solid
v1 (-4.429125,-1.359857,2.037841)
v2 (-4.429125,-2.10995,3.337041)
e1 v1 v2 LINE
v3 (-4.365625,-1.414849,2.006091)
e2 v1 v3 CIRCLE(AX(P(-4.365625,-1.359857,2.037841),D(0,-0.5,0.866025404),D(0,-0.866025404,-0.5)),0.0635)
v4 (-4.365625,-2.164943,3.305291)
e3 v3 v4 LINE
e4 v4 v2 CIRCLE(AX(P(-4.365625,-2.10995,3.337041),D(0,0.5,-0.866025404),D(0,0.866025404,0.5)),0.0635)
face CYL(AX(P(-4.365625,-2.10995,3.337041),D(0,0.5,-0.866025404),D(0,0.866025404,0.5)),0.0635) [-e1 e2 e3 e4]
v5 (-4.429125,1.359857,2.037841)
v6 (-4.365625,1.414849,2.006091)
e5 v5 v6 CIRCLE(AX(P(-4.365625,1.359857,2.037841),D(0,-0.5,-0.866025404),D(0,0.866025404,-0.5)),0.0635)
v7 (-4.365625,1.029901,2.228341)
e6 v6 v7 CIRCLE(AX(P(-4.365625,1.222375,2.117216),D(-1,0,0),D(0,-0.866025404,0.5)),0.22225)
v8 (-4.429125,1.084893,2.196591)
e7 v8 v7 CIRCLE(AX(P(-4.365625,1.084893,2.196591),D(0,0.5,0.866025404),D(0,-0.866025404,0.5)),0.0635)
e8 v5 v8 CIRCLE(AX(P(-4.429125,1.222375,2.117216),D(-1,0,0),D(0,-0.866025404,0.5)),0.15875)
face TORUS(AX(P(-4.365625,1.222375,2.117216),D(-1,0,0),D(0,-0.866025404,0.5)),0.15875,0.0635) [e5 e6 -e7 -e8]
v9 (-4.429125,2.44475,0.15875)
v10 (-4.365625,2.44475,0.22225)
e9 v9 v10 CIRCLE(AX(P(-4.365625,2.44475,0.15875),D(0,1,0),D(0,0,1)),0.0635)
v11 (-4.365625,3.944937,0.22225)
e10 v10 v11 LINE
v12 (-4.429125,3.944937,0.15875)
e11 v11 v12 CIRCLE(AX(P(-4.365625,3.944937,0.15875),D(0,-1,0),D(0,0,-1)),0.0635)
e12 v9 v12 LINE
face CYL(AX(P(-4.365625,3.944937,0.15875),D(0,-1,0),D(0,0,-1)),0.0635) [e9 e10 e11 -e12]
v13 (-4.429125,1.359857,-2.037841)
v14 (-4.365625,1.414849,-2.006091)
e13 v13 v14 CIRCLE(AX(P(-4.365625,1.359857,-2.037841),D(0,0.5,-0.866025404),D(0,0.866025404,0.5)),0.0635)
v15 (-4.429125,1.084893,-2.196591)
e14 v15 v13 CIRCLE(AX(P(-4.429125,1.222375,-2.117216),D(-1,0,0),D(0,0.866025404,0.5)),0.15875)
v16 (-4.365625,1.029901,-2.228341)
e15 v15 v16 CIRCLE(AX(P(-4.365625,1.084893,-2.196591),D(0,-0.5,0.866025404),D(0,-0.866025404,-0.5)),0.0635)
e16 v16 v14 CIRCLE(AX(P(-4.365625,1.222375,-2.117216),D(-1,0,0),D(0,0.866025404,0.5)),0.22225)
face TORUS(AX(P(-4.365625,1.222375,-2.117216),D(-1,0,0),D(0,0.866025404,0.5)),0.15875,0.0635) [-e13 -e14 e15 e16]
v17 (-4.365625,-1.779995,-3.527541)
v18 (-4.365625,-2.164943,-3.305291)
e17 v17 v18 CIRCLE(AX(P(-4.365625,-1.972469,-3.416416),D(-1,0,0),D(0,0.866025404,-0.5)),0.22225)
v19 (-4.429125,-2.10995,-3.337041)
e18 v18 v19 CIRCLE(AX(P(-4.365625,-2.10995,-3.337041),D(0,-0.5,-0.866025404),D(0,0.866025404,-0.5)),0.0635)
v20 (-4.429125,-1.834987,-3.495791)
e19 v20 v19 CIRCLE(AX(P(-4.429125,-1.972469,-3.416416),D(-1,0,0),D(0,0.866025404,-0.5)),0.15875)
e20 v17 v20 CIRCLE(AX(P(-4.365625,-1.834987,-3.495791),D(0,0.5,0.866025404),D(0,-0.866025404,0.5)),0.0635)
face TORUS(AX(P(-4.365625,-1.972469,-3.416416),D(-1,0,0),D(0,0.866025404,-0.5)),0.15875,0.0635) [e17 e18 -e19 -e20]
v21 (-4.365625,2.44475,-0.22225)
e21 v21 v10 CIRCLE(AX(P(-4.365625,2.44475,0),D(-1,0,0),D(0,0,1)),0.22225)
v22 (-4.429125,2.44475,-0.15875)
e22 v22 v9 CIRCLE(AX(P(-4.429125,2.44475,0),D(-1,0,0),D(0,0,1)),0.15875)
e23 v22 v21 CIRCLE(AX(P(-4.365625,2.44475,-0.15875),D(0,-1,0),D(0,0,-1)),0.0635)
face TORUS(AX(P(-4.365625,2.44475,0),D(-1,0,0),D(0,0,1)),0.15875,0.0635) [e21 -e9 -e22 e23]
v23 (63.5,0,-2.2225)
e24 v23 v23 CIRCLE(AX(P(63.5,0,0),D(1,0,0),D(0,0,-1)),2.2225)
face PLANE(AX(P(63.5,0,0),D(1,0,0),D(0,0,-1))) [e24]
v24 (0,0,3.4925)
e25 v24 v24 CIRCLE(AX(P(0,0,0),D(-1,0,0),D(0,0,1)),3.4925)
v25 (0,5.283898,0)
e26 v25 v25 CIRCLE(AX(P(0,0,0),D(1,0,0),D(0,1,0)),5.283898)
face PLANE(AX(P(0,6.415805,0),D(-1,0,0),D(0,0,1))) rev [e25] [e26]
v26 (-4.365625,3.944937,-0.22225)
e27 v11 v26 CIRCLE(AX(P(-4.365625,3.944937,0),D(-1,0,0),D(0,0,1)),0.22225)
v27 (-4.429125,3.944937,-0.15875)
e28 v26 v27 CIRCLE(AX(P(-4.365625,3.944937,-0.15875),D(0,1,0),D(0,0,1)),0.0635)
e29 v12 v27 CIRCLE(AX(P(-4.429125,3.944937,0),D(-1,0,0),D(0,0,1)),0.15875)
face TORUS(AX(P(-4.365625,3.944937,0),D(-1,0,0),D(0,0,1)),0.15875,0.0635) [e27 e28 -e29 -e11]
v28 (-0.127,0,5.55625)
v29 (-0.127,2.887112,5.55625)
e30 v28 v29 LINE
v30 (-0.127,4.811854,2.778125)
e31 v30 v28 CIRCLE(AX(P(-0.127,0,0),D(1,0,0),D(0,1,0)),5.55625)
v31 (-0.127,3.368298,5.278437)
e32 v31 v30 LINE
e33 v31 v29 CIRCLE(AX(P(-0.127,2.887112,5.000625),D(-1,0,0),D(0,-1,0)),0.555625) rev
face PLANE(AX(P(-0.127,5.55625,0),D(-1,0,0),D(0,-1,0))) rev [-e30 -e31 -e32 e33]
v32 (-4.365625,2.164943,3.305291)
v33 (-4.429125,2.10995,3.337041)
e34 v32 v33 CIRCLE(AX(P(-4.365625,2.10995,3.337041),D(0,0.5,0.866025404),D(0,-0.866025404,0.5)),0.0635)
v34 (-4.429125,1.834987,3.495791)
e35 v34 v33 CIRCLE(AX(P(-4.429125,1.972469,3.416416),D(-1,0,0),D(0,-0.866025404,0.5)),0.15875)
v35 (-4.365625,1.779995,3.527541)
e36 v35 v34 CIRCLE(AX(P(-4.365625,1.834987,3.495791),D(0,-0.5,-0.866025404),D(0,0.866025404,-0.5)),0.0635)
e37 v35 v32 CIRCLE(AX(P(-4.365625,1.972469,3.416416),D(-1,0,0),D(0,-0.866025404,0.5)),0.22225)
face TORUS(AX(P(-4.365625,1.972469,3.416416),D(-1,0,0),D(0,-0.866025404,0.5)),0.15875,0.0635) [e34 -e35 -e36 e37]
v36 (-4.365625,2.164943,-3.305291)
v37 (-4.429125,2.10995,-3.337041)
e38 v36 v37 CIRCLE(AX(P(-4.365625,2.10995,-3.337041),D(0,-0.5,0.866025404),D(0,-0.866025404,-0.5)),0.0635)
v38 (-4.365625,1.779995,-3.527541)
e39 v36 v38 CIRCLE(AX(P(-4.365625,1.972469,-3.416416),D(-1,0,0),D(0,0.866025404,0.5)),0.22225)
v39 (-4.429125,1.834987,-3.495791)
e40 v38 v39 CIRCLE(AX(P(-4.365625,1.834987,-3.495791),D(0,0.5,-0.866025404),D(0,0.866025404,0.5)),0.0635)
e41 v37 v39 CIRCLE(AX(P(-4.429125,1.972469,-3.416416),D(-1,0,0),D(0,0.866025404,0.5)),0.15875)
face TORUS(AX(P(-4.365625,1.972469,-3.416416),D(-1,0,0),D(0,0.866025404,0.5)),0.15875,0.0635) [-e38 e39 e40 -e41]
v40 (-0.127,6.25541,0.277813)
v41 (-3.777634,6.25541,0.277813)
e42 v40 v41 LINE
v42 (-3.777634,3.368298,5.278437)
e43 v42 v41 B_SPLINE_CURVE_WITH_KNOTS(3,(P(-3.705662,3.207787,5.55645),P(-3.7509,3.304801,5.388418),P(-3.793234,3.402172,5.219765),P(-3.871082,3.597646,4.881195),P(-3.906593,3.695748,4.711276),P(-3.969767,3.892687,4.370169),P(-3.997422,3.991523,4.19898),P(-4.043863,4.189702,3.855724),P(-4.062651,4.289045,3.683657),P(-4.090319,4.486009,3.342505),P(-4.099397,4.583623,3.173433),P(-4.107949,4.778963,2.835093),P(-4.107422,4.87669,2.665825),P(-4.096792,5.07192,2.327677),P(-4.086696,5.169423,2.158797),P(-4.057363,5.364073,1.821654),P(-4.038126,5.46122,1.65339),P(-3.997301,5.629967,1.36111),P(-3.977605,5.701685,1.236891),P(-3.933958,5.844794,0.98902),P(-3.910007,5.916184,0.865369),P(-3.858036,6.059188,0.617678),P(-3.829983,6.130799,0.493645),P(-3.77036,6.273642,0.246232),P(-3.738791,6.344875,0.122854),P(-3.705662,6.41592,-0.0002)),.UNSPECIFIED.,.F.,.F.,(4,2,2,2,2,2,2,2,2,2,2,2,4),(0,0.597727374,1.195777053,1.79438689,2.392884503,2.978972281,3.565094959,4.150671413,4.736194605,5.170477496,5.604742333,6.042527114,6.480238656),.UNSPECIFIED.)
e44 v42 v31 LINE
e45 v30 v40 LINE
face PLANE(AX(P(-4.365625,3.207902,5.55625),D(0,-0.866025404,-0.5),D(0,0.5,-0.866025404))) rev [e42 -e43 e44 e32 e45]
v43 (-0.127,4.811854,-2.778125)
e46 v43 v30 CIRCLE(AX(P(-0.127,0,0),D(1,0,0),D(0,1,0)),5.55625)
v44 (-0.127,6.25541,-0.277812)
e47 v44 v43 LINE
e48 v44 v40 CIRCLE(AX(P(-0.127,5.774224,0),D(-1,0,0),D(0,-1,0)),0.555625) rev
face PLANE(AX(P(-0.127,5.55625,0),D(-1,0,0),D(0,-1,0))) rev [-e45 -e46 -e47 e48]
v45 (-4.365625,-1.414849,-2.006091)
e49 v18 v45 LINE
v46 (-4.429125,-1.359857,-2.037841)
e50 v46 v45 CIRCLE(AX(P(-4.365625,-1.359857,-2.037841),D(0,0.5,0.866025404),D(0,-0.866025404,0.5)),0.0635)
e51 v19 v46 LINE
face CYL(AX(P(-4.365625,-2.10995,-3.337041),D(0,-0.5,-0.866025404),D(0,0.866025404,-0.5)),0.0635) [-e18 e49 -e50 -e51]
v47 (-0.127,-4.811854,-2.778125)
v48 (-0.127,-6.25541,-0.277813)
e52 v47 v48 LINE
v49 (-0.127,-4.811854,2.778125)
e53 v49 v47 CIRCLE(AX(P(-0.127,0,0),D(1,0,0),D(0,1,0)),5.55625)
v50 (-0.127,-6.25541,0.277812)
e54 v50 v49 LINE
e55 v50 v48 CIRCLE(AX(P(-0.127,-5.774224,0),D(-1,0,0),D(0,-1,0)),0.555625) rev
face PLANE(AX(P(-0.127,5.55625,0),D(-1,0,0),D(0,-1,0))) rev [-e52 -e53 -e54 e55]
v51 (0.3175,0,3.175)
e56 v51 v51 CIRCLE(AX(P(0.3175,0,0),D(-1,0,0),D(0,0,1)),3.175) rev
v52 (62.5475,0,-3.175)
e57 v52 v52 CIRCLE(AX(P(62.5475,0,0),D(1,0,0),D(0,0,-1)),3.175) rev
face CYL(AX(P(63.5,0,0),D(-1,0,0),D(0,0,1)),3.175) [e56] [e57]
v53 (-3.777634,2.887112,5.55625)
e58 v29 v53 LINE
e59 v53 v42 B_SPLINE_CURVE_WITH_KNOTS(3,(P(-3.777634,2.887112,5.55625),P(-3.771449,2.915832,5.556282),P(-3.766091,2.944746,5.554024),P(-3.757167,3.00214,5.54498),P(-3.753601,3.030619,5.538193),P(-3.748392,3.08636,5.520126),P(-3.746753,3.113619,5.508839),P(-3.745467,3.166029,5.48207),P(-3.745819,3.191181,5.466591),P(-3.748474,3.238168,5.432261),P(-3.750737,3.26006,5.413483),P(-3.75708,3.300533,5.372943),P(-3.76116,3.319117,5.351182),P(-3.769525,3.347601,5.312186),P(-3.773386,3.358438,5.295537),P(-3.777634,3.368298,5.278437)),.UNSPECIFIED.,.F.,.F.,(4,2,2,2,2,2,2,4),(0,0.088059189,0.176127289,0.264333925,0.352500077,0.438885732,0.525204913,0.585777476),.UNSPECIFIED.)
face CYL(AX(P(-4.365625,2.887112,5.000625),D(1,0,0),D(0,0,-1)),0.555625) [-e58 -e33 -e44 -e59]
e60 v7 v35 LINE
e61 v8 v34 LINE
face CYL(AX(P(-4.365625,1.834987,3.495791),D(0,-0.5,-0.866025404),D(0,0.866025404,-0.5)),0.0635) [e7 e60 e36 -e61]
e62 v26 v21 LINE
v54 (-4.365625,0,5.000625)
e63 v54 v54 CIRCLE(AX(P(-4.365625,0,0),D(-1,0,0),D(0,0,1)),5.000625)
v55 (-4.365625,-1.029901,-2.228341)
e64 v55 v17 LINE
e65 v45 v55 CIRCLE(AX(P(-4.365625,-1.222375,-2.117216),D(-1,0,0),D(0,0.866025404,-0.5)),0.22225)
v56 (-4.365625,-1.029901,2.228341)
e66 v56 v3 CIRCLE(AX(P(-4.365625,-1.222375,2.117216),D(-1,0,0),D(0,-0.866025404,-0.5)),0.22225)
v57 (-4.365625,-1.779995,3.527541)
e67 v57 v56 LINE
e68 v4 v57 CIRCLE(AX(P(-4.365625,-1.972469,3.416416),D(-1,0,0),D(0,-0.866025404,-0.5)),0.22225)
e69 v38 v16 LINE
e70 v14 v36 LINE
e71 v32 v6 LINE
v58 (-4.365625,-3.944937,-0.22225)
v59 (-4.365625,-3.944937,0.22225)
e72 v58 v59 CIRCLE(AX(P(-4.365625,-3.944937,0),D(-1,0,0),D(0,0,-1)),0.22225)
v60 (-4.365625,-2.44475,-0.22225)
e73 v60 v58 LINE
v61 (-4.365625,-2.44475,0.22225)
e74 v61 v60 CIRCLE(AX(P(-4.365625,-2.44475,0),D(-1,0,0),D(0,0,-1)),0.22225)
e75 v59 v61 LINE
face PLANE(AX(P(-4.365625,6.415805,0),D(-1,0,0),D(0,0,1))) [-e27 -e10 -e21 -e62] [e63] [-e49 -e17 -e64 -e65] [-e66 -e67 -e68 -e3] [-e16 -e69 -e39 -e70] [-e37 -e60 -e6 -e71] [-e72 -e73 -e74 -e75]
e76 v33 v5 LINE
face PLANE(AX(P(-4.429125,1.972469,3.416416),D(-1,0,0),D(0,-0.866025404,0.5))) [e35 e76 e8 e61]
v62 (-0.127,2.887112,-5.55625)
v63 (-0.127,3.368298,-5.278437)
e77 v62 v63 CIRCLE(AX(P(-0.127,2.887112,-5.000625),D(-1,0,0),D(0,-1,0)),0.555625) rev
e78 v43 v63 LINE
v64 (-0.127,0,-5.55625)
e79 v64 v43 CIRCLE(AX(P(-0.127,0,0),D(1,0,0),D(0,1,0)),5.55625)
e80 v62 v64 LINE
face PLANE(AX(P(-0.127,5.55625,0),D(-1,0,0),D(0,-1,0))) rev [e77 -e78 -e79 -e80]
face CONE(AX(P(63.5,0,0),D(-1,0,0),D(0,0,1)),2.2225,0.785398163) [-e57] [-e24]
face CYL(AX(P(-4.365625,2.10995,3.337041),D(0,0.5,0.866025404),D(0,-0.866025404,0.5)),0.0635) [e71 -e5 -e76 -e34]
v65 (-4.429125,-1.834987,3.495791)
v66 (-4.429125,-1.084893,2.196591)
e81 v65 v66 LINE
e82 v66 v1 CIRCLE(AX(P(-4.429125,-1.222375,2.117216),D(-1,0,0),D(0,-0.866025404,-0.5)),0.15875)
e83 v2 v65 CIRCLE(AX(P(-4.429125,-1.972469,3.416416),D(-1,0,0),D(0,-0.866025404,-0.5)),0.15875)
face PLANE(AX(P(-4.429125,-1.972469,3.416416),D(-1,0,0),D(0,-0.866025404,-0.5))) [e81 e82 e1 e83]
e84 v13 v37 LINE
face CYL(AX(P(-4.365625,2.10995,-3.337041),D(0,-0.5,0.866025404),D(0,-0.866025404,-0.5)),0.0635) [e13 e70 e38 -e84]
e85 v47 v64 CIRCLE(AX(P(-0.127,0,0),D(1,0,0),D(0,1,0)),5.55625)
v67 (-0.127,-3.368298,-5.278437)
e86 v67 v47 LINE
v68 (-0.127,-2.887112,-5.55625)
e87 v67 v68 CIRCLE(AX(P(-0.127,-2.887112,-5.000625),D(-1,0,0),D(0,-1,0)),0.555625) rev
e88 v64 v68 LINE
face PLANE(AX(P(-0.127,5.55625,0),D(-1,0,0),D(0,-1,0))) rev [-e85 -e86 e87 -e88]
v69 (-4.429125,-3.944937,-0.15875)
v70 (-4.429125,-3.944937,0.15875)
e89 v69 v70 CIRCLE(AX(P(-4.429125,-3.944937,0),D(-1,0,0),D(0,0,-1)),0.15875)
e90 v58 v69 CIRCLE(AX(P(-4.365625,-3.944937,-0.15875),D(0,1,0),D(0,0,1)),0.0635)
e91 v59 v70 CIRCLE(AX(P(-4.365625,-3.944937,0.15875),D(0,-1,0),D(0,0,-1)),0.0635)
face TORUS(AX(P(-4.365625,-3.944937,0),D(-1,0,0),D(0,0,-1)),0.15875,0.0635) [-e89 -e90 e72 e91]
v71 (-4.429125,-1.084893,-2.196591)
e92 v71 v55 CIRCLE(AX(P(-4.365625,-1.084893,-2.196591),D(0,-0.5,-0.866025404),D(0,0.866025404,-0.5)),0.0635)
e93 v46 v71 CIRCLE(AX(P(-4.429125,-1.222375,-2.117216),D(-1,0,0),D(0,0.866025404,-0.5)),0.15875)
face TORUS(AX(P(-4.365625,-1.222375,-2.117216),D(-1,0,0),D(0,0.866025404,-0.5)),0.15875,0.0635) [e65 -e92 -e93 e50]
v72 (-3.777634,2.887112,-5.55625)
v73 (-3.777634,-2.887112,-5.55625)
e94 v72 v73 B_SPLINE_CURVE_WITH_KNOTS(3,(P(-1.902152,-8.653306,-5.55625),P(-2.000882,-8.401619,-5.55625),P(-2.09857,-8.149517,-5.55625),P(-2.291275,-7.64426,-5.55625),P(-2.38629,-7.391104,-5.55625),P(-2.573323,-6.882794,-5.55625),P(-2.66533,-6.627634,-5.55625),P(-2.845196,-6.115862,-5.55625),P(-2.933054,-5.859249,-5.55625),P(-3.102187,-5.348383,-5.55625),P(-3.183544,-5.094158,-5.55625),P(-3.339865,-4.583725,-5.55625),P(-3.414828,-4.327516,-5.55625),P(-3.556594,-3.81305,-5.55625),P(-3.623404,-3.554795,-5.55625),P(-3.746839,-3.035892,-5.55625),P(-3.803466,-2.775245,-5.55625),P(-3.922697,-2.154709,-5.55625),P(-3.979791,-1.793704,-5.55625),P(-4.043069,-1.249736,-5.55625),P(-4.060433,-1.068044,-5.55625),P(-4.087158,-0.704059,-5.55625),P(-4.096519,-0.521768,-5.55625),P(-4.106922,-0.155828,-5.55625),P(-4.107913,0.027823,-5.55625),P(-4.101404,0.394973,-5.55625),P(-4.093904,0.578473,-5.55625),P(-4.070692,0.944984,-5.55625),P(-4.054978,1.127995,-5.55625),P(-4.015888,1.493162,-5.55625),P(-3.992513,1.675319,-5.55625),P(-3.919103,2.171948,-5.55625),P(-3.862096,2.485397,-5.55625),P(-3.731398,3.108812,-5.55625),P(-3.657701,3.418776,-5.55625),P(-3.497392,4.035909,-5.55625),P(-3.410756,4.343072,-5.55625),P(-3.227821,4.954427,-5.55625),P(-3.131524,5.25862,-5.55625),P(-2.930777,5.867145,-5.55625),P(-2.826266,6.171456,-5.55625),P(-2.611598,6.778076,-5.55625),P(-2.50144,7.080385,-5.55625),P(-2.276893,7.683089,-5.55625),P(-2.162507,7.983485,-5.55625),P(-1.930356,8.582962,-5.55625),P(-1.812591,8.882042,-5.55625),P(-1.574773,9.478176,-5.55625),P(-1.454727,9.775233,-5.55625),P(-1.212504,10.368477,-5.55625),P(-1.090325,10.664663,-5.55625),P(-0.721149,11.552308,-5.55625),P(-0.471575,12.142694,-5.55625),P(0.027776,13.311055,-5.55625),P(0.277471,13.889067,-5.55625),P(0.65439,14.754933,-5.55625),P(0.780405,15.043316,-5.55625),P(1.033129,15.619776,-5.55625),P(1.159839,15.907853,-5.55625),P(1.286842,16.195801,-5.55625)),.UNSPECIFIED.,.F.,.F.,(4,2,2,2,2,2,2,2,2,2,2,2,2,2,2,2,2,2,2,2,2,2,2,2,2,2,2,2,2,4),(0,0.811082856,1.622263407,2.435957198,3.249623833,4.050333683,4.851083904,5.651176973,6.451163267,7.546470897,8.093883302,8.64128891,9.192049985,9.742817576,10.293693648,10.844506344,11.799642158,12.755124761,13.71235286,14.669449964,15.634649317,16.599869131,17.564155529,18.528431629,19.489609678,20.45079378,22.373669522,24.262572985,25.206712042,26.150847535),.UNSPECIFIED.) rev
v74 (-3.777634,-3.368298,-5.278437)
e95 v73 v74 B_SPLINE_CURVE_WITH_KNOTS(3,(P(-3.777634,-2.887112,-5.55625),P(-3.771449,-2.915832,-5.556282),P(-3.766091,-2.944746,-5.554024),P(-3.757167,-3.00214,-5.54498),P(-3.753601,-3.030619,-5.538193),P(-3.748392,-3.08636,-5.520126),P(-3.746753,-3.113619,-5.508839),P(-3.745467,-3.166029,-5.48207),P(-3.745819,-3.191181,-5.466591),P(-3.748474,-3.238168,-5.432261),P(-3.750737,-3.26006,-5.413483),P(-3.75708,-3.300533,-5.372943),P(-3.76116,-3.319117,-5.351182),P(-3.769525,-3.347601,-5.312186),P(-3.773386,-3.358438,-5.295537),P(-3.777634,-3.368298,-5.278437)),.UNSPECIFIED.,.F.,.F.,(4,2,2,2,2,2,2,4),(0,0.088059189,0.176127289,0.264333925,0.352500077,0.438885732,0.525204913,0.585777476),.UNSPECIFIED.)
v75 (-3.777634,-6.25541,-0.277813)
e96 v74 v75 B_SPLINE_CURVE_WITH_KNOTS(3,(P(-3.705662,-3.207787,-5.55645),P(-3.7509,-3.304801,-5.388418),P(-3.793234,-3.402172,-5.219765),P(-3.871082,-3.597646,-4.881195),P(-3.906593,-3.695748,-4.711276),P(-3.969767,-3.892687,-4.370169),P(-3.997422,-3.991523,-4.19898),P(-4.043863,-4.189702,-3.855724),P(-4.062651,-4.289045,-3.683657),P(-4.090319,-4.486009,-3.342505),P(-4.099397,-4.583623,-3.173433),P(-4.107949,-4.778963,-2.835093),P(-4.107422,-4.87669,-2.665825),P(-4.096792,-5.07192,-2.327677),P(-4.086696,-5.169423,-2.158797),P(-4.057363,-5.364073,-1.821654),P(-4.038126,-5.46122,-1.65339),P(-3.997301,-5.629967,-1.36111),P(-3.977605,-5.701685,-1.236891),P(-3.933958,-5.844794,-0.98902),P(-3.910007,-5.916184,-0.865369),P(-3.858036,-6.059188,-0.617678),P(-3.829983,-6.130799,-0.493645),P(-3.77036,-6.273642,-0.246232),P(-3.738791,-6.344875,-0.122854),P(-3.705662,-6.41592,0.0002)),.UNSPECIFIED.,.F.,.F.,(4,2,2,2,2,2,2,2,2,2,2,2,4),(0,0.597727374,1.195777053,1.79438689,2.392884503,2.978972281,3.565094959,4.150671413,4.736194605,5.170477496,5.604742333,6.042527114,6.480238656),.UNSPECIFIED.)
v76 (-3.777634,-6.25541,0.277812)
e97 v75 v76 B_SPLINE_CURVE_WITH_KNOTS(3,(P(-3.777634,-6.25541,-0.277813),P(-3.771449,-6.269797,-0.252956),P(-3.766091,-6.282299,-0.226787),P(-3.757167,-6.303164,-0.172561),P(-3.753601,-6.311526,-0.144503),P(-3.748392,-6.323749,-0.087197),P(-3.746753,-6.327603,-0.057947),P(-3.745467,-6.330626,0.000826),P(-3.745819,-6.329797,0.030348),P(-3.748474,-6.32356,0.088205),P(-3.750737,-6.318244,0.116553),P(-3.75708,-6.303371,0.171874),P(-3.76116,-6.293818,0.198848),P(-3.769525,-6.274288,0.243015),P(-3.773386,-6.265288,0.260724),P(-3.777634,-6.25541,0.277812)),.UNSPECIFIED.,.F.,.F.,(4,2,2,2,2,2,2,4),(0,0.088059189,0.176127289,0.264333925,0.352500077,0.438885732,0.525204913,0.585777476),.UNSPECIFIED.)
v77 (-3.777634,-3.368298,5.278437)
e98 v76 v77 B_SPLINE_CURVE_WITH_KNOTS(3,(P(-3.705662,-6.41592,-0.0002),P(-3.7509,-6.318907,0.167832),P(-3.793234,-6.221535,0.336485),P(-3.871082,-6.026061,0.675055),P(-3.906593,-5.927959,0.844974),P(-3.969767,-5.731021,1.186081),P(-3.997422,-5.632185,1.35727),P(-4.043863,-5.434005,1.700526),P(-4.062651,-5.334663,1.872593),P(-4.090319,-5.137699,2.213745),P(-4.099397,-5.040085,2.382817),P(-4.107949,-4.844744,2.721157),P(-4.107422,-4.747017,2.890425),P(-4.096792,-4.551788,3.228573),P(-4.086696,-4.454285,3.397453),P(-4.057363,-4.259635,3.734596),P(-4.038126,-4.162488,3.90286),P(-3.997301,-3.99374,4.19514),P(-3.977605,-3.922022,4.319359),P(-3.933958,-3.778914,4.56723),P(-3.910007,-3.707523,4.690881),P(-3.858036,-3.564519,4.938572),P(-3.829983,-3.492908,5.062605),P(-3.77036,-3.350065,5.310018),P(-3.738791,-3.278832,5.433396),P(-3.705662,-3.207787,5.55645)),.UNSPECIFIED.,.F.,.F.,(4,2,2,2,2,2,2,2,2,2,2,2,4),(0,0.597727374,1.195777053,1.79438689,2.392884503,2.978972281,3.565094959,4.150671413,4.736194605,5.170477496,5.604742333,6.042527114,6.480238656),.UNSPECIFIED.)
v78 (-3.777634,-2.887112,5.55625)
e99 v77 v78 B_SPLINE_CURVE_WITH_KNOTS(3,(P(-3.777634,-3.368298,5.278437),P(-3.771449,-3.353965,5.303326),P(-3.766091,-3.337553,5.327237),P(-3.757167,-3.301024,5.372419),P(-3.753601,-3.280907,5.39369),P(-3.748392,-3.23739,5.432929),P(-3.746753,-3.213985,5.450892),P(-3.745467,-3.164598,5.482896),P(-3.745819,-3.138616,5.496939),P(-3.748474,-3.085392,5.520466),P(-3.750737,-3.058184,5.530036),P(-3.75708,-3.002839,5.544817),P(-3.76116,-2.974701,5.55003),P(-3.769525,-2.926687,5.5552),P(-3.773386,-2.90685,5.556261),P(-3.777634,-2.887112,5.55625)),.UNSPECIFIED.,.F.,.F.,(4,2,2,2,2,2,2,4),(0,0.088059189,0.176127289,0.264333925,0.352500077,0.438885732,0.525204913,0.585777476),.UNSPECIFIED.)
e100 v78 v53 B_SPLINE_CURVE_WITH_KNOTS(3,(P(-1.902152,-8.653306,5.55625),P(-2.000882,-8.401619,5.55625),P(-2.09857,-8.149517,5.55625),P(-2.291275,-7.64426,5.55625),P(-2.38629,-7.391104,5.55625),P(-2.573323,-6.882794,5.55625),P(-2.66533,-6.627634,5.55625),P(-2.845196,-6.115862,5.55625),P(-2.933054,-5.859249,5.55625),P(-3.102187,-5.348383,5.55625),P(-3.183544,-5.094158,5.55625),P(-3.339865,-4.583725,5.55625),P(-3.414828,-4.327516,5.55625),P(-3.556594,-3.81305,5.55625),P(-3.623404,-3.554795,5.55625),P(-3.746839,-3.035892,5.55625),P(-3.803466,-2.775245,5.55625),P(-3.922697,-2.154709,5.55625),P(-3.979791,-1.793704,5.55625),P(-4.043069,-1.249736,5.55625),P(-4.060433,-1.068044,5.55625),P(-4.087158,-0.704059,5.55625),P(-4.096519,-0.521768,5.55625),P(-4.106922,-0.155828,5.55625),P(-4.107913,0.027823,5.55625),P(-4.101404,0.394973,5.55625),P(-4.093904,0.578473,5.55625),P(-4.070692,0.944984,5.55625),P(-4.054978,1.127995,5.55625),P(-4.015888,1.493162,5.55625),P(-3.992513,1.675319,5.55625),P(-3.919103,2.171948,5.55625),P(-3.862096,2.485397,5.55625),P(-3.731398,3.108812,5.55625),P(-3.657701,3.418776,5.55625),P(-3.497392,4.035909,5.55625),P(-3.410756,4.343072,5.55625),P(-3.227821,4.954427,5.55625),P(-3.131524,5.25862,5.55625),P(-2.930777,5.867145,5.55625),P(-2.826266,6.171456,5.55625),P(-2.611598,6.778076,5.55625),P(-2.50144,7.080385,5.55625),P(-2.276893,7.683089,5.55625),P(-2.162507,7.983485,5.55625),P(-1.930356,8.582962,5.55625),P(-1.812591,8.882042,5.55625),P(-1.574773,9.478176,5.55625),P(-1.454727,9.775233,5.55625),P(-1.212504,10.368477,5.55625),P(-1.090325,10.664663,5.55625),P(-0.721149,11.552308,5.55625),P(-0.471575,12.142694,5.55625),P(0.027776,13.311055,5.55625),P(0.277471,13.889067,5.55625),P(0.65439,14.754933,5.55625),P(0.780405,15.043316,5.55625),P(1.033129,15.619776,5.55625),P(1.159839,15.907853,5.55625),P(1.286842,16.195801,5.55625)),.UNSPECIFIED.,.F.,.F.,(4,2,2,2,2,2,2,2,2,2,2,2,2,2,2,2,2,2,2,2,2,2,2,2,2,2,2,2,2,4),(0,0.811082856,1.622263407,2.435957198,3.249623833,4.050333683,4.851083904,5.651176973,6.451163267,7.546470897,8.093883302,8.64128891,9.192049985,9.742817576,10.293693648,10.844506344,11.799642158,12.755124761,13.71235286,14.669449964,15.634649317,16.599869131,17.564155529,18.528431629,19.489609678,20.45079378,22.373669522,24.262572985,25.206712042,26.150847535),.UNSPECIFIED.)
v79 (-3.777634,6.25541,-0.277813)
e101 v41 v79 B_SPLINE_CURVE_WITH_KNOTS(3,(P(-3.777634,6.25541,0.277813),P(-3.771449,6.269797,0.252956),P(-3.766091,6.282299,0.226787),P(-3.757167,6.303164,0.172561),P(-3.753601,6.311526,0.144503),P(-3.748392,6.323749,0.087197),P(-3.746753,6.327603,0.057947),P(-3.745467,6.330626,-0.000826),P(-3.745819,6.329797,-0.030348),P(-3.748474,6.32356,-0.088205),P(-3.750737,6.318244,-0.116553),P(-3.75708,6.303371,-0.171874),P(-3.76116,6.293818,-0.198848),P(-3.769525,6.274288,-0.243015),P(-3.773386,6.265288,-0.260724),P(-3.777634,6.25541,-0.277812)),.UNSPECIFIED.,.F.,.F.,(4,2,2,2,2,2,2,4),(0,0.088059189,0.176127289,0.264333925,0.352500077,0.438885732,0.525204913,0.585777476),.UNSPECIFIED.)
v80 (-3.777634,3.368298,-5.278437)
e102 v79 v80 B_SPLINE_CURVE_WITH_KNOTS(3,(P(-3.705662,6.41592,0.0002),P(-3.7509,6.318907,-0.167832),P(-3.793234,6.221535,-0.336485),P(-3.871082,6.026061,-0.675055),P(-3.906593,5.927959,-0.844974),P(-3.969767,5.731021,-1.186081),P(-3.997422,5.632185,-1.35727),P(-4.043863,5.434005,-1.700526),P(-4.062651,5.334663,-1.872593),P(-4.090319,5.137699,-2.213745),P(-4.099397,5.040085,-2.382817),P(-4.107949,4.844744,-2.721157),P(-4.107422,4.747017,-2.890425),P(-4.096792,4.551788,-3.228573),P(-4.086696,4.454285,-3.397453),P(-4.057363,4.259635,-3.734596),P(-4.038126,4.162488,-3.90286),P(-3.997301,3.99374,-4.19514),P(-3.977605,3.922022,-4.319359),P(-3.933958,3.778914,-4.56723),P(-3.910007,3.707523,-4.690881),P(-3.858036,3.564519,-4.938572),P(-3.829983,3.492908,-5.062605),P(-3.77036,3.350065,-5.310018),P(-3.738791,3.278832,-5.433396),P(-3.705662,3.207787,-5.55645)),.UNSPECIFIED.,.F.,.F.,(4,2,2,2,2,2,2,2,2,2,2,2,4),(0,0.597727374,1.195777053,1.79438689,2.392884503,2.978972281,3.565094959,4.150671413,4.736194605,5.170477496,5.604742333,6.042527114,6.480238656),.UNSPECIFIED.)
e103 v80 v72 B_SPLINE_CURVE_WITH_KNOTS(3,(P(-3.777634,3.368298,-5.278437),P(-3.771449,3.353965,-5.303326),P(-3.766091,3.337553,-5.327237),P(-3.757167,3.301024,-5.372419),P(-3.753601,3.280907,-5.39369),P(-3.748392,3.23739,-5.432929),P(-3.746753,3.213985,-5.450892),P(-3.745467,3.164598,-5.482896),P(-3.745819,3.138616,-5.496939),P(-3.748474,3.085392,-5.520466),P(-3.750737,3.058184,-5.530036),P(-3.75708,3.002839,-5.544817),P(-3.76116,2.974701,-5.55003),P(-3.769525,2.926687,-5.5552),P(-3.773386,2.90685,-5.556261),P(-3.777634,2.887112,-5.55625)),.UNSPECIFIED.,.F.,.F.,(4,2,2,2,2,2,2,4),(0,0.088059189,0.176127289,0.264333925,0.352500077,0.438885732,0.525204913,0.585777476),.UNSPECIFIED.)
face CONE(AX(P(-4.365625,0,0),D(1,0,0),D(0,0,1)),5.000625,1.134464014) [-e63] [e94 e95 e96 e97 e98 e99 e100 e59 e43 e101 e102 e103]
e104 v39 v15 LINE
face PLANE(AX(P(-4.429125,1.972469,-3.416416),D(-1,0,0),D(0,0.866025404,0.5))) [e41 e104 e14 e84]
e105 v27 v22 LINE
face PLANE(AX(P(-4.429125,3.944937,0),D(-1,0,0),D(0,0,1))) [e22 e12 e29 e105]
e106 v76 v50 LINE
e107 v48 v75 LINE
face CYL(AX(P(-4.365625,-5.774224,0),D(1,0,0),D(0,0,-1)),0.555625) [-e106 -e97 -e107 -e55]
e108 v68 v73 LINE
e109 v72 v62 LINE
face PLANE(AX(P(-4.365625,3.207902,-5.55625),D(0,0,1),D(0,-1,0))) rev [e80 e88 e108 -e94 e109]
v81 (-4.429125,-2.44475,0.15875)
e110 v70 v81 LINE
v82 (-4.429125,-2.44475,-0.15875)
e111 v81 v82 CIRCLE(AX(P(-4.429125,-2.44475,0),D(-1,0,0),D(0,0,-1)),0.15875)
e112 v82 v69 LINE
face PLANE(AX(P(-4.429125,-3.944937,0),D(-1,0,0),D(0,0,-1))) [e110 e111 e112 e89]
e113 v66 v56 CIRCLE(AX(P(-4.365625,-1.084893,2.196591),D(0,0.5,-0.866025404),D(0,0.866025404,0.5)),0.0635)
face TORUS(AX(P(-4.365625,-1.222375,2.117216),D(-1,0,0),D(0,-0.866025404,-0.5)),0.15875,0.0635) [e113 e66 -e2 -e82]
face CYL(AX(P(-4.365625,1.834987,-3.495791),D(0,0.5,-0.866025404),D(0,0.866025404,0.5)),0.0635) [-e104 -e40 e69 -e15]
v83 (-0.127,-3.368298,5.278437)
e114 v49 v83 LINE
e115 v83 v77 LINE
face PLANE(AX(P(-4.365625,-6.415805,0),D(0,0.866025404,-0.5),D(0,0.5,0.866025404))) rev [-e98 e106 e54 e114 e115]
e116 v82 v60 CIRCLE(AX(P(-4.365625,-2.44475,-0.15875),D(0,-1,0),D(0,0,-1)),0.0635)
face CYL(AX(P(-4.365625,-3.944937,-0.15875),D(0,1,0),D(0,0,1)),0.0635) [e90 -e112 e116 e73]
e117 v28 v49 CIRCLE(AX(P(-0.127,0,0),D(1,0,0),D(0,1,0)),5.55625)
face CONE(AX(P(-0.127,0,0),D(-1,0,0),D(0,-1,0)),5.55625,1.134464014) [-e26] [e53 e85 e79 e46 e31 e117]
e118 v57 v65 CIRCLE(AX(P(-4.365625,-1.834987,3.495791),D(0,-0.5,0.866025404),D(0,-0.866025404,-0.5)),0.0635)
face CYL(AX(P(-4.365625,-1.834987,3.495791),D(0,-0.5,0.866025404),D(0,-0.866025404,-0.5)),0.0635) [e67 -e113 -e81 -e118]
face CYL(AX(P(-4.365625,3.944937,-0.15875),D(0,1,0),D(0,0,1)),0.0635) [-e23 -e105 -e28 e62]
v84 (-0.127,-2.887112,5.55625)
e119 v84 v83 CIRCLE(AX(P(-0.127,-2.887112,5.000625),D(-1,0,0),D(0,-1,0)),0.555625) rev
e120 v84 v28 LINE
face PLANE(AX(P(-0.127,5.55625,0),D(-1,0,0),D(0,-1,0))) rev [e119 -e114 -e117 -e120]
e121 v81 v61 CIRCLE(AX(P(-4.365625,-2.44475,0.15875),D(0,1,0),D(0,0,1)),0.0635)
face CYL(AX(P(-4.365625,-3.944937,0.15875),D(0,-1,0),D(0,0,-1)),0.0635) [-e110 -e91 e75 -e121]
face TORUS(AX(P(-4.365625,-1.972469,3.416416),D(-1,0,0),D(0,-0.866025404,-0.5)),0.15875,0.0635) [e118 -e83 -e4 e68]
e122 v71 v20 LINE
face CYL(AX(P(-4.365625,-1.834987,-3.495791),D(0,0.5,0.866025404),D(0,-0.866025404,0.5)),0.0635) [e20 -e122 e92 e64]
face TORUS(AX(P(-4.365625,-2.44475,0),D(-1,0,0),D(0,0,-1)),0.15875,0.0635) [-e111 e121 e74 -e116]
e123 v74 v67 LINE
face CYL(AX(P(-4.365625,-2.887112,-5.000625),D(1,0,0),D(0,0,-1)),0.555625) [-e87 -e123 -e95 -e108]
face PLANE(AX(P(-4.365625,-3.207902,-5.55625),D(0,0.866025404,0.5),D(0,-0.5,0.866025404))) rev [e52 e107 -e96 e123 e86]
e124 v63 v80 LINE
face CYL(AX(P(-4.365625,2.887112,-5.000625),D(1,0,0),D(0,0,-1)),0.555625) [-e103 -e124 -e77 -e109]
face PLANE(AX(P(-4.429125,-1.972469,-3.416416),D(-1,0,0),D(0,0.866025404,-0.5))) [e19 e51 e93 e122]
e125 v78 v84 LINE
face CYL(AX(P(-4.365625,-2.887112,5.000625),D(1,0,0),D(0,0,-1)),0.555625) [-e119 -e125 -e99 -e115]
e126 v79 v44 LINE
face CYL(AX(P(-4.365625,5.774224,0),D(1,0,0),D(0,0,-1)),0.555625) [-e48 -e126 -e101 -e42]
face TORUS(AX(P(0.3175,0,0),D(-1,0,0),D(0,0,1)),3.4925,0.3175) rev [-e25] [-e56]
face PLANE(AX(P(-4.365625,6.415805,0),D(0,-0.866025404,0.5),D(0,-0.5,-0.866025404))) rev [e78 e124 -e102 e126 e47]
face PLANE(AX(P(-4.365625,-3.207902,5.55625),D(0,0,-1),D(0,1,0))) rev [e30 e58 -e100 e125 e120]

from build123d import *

# Parameters (mm, degrees)
SKETCH2_R                = 3.175
BOSS_EXTRUDE1_DEPTH      = 63.5
BOSS_EXTRUDE2_DEPTH      = 4.365625
SKETCH5_OUTSIDE_W        = 45.828
SKETCH5_OUTSIDE_H        = 47.548
SKETCH5_OUTSIDE_R        = 5.000625
CUT_EXTRUDE1_DEPTH       = 4.365625
CUT_EXTRUDE1_DRAFT       = -65
BOSS_EXTRUDE5_DEPTH      = 0.0635
FILLET5_R                = 0.0635
CIRPATTERN1_COUNT        = 6
FILLET5_OF_CIRPATTERN1_R = 0.0635
FILLET7_R                = 0.555625
CHAMFER1_SIZE            = 0.9525
FILLET4_R                = 0.3175


with BuildPart() as part:
    # Sketch2 → Boss-Extrude1 (new body)
    with BuildSketch(Plane(origin=(0, 0, 0), x_dir=(0, 0, -1), z_dir=(1, 0, 0))):
        Circle(SKETCH2_R)
    extrude(amount=BOSS_EXTRUDE1_DEPTH)

    # Sketch3 → Boss-Extrude2 (add)
    with BuildSketch(Plane.ZY):
        Polygon((0, 6.415804866), (-5.55625, 3.207902433), (-5.55625, -3.207902433), (0, -6.415804866), (5.55625, -3.207902433), (5.55625, 3.207902433), align=None)
    extrude(amount=BOSS_EXTRUDE2_DEPTH)


with BuildPart() as cut_extrude1_tool:
    # Sketch5 outside → Cut-Extrude1 (with draft: the straight prism first)
    with BuildSketch(Plane.ZY.offset(4.365625)):
        Rectangle(SKETCH5_OUTSIDE_W, SKETCH5_OUTSIDE_H)
        Circle(SKETCH5_OUTSIDE_R, mode=Mode.SUBTRACT)
    extrude(amount=-CUT_EXTRUDE1_DEPTH)
    # Cut-Extrude1: the draft: its side faces are tilted about the plane it starts from
    cut_extrude1_sides = [cut_extrude1_tool.faces().sort_by_distance(p)[0] for p in [
        (-2.1828125, -23.774, 0),
        (-2.1828125, 0, 22.914),
        (-2.1828125, 23.774, 0),
        (-2.1828125, 0, -22.914),
        (-2.1828125, 0, -5.000625),
    ]]
    draft(cut_extrude1_sides, Plane.ZY.offset(4.365625), CUT_EXTRUDE1_DRAFT)


with BuildPart() as part_1:
    add(part.part)

    # Cut-Extrude1: cut by cut_extrude1_tool
    add(cut_extrude1_tool.part, mode=Mode.SUBTRACT)

    # Sketch11 → Boss-Extrude5 (add)
    with BuildSketch(Plane.ZY.offset(4.365625)):
        with BuildLine():
            Line((0.22225, 3.9449375), (0.22225, 2.44475))
            ThreePointArc((0.22225, 2.44475), (0, 2.2225), (-0.22225, 2.44475))
            Line((-0.22225, 2.44475), (-0.22225, 3.9449375))
            ThreePointArc((-0.22225, 3.9449375), (0, 4.1671875), (0.22225, 3.9449375))
        make_face()
    boss_extrude5 = extrude(amount=BOSS_EXTRUDE5_DEPTH)

    # Fillet5
    fillet5_edges = [part_1.edges().sort_by_distance(p)[0] for p in [
        (-4.429125, 3.19484375, 0.22225),
        (-4.429125, 2.2225, 0),
        (-4.429125, 3.19484375, -0.22225),
        (-4.429125, 4.1671875, 0),
    ]]
    fillet(fillet5_edges, radius=FILLET5_R - 0.0001)  # a hair under: the kernel refuses the full size

    # CirPattern1: Boss-Extrude5 ×6 about axis
    cirpattern1_axis = Axis((0, 0, 0), (1, 0, 0))
    for i in range(1, CIRPATTERN1_COUNT):
        add(boss_extrude5.rotate(cirpattern1_axis, i * 360 / CIRPATTERN1_COUNT))

    # Fillet5 of CirPattern1
    fillet5_of_cirpattern1_edges = [part_1.edges().sort_by_distance(p)[0] for p in [
        (-4.429125, 1.404947729, 2.877940849),
        (-4.429125, 1.11125, 1.92474146),
        (-4.429125, 1.789896021, 2.655690849),
        (-4.429125, 2.08359375, 3.608890237),
        (-4.429125, -1.789896021, 2.655690849),
        (-4.429125, -1.11125, 1.92474146),
        (-4.429125, -1.404947729, 2.877940849),
        (-4.429125, -2.08359375, 3.608890237),
        (-4.429125, -3.19484375, -0.22225),
        (-4.429125, -2.2225, 0),
        (-4.429125, -3.19484375, 0.22225),
        (-4.429125, -4.1671875, 0),
        (-4.429125, -1.404947729, -2.877940849),
        (-4.429125, -1.11125, -1.92474146),
        (-4.429125, -1.789896021, -2.655690849),
        (-4.429125, -2.08359375, -3.608890237),
        (-4.429125, 1.789896021, -2.655690849),
        (-4.429125, 1.11125, -1.92474146),
        (-4.429125, 1.404947729, -2.877940849),
        (-4.429125, 2.08359375, -3.608890237),
    ]]
    fillet(fillet5_of_cirpattern1_edges, radius=FILLET5_OF_CIRPATTERN1_R - 0.0001)  # a hair under: the kernel refuses the full size

    # Fillet7
    fillet7_edges = [part_1.edges().sort_by_distance(p)[0] for p in [
        (-1.852857895, -6.415804866, 0),
        (-1.852857895, -3.207902433, -5.55625),
        (-1.852857895, 3.207902433, -5.55625),
        (-1.852857895, 6.415804866, 0),
        (-1.852857895, -3.207902433, 5.55625),
        (-1.852857895, 3.207902433, 5.55625),
    ]]
    fillet(fillet7_edges, radius=FILLET7_R)

    # Chamfer1
    chamfer1_edges = [part_1.edges().sort_by_distance(p)[0] for p in [
        (63.5, 0, 3.175),
    ]]
    chamfer(chamfer1_edges, length=CHAMFER1_SIZE)

    # Sketch15 → Cut-Revolve1 (revolve, cut)
    with BuildSketch(Plane.XY, mode=Mode.PRIVATE) as cut_revolve1_sk:
        Polygon((0, 5.283897621), (-0.127, 5.55625), (-0.127, 6.415804866), (0, 6.415804866), align=None)
    revolve(cut_revolve1_sk.sketch.rotate(Axis((0, 0, 0), (-1, 0, 0)), 210), axis=Axis((0, 0, 0), (-1, 0, 0)), mode=Mode.SUBTRACT)

    # Fillet4
    fillet4_edges = [part_1.edges().sort_by_distance(p)[0] for p in [
        (0, 0, 3.175),
    ]]
    fillet(fillet4_edges, radius=FILLET4_R)


solid = part_1.part
